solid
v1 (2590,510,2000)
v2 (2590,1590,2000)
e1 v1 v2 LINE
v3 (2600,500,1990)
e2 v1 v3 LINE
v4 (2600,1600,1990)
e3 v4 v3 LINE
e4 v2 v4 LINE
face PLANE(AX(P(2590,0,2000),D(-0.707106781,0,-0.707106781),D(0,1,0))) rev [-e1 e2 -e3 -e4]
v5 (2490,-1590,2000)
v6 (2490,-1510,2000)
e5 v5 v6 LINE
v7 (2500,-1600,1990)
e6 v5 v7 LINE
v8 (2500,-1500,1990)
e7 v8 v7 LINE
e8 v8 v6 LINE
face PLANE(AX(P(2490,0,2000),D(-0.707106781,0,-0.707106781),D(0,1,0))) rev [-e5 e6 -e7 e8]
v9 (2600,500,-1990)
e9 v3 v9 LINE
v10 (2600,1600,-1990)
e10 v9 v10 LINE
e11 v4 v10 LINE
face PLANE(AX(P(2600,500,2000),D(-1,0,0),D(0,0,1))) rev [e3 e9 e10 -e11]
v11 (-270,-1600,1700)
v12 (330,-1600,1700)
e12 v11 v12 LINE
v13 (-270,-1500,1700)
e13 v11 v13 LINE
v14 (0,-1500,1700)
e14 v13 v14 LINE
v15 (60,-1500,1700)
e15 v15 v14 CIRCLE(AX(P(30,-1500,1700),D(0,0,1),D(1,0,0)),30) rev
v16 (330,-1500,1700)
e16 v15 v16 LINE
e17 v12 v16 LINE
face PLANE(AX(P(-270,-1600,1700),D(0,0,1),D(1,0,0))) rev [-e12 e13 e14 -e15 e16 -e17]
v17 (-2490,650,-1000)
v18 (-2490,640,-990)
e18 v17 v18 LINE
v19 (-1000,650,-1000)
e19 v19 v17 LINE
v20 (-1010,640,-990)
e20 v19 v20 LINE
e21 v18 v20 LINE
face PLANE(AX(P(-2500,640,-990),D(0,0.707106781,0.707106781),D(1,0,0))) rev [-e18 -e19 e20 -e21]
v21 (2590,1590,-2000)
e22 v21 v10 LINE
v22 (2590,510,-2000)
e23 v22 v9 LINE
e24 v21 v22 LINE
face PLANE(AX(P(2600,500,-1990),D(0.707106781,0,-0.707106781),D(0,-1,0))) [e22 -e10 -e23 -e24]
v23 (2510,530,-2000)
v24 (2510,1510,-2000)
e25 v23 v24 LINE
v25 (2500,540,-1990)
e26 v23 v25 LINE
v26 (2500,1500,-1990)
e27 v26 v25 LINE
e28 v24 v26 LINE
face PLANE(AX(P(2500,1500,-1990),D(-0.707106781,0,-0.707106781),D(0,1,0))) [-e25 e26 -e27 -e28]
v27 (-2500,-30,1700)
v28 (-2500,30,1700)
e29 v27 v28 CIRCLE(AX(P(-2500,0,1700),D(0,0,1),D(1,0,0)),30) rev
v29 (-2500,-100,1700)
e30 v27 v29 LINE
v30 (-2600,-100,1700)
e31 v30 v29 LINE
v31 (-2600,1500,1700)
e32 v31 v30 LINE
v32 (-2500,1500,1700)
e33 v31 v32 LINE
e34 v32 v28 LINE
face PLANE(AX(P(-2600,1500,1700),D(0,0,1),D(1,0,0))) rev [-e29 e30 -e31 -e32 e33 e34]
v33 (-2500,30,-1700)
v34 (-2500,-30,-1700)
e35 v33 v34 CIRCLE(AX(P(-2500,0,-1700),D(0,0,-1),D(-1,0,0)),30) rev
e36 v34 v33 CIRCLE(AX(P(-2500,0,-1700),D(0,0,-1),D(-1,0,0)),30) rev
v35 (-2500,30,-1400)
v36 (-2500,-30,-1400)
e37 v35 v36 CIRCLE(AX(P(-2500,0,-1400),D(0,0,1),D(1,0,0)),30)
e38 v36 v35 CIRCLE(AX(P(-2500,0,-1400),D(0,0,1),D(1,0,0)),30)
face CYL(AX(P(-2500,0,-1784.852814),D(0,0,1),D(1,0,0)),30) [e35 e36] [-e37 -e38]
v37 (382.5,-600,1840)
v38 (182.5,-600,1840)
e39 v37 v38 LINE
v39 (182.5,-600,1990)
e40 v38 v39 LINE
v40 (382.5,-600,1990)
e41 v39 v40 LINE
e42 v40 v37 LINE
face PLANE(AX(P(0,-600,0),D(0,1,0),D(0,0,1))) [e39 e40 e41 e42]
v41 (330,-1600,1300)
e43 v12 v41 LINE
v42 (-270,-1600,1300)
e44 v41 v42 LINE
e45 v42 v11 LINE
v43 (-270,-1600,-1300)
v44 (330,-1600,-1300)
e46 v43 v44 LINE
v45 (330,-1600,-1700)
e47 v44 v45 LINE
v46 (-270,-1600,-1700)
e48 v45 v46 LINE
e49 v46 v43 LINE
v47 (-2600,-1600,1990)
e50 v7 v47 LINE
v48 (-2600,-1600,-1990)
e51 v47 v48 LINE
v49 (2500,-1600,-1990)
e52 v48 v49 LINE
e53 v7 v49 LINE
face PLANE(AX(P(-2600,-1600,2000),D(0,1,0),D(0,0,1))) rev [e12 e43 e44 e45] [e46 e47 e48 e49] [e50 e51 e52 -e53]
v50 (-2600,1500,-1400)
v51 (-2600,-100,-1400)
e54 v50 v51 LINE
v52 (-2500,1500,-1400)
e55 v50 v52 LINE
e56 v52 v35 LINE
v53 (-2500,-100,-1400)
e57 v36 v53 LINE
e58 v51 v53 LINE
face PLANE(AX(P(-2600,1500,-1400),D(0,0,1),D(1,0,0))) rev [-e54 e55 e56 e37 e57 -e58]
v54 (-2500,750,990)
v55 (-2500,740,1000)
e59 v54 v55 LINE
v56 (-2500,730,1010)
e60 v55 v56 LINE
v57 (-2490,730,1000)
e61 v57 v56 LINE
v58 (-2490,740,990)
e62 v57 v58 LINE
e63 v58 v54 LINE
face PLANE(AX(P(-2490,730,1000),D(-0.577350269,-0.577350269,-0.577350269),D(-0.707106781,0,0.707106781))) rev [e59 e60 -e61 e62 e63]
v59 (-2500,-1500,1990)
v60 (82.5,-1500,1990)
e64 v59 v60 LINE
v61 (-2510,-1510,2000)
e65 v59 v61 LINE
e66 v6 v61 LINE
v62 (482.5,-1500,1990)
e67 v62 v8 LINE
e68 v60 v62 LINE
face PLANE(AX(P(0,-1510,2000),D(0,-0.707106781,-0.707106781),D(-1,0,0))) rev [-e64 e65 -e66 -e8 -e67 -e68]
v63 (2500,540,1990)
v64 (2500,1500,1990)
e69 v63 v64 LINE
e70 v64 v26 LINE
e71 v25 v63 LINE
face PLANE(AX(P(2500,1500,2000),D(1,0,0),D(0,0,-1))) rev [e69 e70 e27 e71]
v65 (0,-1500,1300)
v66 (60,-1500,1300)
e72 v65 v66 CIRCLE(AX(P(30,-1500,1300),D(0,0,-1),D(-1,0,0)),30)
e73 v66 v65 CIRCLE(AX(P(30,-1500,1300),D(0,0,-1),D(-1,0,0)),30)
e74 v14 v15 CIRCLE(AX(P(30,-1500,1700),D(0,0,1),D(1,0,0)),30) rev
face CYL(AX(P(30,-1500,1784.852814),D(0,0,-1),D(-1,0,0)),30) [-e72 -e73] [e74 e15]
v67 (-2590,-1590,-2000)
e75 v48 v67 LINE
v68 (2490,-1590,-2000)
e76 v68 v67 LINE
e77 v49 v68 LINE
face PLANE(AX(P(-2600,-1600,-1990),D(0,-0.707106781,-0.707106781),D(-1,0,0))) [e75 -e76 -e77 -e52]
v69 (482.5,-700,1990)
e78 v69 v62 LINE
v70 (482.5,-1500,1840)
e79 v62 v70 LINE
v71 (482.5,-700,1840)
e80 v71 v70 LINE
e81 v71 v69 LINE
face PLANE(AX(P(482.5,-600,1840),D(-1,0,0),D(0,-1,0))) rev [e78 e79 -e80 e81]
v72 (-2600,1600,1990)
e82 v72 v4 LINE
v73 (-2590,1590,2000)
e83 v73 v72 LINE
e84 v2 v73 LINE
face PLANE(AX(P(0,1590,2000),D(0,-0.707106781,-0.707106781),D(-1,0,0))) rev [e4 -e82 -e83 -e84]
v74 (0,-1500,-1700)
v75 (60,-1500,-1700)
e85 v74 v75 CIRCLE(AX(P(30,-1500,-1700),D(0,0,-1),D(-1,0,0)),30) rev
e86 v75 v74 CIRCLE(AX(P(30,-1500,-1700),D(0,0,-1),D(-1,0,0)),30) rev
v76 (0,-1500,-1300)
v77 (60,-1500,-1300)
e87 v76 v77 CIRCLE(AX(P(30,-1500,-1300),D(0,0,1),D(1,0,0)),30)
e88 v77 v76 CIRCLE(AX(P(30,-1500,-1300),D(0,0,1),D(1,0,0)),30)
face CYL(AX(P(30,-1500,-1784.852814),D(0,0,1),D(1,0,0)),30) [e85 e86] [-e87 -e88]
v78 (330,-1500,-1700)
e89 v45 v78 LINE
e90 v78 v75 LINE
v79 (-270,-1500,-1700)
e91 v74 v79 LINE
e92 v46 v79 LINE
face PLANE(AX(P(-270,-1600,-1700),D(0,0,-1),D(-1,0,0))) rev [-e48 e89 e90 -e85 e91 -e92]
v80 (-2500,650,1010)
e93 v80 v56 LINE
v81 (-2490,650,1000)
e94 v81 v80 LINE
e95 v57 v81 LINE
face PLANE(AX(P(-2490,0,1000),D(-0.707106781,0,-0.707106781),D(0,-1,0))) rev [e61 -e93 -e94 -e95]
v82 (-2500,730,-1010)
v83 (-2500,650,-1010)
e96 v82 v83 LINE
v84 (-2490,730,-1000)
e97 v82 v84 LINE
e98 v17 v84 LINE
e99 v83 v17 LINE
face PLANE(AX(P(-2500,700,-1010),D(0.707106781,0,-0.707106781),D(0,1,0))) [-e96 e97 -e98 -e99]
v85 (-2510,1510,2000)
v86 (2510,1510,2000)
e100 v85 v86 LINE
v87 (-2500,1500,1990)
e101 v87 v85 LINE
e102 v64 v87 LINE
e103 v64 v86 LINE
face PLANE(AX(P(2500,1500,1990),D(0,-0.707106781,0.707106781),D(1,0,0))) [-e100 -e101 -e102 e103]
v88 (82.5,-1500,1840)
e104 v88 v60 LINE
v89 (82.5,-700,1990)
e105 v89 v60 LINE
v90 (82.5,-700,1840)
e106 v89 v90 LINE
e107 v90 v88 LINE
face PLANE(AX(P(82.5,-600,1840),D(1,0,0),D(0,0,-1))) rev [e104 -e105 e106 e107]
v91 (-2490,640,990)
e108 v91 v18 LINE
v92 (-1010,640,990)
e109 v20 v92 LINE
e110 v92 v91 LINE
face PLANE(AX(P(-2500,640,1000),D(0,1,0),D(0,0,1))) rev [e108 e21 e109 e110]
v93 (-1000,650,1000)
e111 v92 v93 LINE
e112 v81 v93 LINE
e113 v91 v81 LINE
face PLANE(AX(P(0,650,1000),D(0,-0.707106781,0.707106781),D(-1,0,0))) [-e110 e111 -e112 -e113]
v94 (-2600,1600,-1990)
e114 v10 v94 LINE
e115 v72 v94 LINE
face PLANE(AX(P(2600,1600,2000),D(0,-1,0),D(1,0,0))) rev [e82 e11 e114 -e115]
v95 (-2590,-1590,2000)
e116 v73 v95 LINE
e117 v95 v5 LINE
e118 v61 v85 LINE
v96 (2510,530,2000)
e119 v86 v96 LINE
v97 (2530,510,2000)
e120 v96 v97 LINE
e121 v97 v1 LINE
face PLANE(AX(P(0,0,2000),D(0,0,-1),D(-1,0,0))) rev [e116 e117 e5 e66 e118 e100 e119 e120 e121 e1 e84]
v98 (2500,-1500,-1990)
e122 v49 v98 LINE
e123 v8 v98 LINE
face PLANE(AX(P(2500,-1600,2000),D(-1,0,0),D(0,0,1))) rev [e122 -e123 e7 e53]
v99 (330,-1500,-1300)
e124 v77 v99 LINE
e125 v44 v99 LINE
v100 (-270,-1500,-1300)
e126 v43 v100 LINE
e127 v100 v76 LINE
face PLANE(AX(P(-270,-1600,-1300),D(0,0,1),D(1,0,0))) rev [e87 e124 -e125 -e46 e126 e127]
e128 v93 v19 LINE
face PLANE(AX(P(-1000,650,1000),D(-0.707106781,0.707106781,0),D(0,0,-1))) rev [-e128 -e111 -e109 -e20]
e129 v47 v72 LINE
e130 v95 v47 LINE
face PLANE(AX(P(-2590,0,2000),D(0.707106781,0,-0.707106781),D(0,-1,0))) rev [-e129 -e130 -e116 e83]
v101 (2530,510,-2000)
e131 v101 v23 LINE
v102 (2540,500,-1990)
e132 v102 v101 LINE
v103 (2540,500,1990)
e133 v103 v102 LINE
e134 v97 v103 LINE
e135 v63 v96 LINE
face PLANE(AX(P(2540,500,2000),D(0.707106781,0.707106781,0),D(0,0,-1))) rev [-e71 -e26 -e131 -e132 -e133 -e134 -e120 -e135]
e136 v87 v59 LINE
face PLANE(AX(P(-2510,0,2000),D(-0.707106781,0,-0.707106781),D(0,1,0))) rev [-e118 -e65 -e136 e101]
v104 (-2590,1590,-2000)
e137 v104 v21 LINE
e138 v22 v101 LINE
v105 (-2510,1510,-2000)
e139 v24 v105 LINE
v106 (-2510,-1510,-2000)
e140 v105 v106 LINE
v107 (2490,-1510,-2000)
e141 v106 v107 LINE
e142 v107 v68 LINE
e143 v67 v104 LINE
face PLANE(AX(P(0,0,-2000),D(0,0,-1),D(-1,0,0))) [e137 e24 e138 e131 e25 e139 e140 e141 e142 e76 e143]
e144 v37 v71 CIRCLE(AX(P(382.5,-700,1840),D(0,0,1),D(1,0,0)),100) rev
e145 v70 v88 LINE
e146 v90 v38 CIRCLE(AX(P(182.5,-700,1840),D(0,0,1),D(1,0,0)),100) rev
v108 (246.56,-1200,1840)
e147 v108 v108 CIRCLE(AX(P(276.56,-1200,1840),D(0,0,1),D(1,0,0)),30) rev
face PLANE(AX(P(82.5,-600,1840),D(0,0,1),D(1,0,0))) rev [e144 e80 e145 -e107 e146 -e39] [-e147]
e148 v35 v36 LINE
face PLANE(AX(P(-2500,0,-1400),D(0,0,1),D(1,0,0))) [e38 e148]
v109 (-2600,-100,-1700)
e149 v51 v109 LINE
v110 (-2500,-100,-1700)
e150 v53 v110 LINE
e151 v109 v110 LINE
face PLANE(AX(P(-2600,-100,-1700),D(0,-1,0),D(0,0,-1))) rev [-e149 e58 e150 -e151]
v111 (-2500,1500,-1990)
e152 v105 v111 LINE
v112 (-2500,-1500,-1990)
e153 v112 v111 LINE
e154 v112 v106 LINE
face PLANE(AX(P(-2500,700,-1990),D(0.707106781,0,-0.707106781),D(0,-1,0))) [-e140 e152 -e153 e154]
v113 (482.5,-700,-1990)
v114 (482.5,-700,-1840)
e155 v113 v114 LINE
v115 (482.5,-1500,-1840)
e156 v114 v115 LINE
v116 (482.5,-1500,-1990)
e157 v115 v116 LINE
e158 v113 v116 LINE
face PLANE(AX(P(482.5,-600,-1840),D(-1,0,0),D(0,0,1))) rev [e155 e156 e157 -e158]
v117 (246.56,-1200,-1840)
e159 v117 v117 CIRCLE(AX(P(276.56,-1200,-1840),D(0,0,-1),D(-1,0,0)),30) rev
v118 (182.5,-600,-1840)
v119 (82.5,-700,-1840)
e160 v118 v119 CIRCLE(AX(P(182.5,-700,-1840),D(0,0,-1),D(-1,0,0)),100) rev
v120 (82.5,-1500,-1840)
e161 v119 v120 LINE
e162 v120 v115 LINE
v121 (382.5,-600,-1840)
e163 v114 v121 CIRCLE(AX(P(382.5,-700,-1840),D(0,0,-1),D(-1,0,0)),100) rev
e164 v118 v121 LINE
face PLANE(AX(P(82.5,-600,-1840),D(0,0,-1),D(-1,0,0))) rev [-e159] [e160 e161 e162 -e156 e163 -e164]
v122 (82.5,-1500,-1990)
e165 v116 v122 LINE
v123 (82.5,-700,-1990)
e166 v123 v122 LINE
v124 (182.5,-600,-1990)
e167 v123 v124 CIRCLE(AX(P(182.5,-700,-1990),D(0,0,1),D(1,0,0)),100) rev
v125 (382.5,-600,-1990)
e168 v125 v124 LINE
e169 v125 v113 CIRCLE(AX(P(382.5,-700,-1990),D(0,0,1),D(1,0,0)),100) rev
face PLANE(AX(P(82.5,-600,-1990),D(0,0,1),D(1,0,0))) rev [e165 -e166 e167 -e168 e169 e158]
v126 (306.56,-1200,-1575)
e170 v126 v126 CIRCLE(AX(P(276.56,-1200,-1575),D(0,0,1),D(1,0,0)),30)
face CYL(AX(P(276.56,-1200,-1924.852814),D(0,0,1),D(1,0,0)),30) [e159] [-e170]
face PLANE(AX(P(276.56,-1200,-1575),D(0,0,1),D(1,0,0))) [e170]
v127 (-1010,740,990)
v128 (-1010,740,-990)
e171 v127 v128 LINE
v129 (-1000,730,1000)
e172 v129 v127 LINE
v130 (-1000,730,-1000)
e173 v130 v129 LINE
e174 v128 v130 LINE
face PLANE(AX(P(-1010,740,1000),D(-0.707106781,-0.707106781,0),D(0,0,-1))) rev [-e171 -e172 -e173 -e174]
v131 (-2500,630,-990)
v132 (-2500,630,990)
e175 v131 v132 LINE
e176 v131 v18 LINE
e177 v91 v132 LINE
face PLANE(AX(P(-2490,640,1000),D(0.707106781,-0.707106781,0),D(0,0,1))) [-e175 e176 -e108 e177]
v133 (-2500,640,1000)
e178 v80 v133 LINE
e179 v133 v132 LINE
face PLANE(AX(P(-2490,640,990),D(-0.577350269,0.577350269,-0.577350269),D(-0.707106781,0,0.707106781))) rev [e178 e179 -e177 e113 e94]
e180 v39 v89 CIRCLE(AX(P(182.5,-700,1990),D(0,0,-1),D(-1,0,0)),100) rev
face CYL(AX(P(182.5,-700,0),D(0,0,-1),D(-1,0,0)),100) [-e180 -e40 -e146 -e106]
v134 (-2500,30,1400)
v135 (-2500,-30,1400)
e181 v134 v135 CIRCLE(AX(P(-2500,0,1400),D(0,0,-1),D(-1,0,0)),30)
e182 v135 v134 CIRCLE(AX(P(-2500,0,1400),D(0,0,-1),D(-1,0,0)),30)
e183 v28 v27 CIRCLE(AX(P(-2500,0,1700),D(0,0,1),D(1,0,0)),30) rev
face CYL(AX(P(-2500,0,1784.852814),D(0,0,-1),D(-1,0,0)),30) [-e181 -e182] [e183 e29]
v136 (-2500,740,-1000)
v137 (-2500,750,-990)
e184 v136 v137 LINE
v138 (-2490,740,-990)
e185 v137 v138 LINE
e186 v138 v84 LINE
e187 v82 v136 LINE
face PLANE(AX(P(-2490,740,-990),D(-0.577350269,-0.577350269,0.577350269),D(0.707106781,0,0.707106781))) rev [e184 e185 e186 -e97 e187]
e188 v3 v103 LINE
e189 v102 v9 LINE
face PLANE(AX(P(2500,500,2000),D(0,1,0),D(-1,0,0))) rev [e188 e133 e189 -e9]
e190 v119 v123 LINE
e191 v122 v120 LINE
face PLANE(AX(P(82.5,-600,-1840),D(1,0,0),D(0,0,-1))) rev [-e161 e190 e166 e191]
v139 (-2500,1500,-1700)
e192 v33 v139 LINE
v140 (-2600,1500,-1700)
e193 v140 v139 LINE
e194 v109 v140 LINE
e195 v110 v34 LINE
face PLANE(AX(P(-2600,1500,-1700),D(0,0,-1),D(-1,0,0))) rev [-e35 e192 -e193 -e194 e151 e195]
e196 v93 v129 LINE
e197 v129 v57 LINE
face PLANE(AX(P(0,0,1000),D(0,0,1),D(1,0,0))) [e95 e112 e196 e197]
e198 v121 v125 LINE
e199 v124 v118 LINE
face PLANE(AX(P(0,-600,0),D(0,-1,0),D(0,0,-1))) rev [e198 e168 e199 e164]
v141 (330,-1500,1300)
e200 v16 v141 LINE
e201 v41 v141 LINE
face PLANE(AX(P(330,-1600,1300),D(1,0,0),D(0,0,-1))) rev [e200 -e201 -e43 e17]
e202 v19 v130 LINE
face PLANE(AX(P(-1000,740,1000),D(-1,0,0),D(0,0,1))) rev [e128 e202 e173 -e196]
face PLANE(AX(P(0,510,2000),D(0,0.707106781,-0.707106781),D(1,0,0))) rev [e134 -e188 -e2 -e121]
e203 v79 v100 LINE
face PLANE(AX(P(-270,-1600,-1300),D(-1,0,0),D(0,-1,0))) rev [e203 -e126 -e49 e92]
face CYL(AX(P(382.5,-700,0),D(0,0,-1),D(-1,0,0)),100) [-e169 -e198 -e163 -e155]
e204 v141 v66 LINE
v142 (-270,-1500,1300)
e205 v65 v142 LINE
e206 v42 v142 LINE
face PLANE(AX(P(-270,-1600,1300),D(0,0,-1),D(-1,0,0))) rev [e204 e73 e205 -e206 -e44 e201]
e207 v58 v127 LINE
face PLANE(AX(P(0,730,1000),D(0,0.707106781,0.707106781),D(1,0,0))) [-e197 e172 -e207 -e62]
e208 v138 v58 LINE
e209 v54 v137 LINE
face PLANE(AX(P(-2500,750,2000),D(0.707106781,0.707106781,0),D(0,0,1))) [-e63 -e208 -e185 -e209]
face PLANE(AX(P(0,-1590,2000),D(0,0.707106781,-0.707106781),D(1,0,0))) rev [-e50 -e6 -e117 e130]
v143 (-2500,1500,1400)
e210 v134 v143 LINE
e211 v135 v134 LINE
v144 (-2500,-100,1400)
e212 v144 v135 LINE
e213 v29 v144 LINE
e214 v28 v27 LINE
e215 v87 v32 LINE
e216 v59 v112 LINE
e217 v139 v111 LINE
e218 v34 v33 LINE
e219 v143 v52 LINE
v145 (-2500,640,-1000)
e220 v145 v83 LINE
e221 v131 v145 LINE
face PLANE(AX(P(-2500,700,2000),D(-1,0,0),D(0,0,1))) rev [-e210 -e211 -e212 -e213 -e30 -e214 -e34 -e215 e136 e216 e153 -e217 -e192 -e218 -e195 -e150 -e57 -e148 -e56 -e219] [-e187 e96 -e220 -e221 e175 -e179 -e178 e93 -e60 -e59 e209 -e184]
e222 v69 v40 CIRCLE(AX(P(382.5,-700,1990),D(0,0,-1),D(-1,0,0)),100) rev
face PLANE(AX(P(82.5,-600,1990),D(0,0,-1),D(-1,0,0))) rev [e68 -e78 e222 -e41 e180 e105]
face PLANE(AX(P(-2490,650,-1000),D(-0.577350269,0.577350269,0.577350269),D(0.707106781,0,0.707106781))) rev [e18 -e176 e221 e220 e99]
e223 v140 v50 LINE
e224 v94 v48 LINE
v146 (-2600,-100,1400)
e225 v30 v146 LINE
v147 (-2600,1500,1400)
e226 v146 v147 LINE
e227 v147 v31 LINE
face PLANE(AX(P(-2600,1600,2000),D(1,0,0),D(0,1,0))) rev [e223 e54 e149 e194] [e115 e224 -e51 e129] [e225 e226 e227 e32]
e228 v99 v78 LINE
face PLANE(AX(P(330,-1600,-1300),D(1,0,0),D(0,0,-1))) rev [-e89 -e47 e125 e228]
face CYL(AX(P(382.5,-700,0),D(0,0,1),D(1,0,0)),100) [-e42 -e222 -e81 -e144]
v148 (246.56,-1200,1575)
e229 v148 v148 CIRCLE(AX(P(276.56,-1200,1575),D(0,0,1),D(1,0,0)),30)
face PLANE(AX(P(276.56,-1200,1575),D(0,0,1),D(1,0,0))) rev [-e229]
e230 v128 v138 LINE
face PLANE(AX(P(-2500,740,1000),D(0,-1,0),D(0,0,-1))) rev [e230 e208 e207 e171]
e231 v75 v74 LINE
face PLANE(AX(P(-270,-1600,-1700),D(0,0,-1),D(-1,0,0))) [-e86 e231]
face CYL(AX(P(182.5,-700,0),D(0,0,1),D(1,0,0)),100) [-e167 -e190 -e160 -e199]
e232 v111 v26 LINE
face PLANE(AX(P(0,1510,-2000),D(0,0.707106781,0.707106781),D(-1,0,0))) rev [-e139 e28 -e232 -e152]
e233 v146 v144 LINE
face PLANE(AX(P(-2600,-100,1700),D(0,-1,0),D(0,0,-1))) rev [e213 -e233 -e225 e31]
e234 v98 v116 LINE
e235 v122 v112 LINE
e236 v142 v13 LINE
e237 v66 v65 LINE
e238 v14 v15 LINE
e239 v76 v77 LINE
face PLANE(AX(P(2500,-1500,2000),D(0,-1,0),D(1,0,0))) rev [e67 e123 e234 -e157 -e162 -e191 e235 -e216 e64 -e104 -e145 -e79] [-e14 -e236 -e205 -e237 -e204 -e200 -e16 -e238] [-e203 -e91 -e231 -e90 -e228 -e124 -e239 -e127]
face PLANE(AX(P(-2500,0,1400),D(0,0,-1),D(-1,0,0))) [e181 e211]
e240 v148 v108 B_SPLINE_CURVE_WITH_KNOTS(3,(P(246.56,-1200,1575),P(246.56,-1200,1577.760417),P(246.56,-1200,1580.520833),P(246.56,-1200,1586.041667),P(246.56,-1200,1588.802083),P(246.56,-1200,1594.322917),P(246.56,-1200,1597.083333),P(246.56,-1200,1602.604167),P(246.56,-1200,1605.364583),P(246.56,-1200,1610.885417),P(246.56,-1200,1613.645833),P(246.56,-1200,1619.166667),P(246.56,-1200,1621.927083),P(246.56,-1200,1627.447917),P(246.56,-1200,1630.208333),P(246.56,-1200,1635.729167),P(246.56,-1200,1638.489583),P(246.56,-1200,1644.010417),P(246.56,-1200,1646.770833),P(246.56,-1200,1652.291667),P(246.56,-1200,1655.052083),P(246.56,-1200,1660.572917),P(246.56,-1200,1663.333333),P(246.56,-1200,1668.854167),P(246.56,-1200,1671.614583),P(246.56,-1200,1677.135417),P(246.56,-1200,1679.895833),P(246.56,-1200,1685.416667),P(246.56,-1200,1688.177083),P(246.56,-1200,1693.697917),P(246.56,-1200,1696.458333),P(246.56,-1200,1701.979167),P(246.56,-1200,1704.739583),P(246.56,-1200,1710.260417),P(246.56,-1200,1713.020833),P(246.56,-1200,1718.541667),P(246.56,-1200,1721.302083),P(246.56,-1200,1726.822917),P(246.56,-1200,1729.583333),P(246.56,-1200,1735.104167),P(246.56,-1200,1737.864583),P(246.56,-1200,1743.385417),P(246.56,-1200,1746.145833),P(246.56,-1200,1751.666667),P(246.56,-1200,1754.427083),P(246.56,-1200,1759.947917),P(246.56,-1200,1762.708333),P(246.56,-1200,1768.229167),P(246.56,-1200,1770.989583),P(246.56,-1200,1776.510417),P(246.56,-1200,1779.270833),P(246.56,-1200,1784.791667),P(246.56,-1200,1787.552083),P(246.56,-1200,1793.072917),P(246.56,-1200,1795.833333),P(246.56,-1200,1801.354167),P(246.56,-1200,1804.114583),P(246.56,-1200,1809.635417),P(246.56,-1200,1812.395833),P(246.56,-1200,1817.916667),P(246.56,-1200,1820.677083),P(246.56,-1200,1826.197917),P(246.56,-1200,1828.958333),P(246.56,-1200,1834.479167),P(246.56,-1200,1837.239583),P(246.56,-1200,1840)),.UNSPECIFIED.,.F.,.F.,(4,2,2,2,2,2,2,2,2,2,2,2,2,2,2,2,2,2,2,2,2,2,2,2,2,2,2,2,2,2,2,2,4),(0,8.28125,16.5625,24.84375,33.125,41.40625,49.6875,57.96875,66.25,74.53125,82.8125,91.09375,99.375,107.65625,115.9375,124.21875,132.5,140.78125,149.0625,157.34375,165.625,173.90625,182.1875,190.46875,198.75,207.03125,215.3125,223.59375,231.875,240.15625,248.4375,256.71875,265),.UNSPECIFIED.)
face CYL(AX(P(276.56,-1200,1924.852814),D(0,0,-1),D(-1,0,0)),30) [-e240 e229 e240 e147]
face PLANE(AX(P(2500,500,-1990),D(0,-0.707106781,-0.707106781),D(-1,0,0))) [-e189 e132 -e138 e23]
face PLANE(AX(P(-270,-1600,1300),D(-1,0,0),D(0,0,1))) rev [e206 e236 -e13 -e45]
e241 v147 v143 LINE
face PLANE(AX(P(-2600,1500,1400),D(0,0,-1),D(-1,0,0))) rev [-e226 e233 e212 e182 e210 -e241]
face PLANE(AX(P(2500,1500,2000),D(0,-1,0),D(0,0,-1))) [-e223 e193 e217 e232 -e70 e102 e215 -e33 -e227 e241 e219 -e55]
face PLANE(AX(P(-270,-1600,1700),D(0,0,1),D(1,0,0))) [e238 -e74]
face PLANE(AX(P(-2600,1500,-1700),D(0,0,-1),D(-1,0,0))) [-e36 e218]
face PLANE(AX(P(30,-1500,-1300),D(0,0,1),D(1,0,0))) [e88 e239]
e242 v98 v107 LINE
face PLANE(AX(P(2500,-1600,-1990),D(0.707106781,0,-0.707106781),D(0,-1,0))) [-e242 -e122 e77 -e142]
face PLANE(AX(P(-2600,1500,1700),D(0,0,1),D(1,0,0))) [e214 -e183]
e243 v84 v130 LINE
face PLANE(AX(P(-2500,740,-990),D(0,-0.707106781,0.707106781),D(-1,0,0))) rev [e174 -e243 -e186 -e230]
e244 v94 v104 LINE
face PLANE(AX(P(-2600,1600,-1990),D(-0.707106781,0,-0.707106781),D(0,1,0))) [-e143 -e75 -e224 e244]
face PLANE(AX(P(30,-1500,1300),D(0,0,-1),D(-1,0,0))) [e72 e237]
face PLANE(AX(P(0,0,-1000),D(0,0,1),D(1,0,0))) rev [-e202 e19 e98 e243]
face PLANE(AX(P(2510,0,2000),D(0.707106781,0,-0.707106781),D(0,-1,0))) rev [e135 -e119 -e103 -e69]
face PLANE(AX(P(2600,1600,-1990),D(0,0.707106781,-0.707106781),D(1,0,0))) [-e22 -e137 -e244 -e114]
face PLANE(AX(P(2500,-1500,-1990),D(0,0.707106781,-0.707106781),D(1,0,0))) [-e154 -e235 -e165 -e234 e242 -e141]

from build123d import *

# Parameters (mm, degrees)
BOSS_EXTRUDE1_DEPTH  = 2000
SKETCH4_W            = 600
SKETCH4_H            = 400
CUT_EXTRUDE1_DEPTH   = 4514.313638559
BOSS_EXTRUDE5_START  = 1300
SKETCH5_R            = 30
BOSS_EXTRUDE5_DEPTH  = 400
BOSS_EXTRUDE6_START  = -1700
SKETCH5_2_R          = 30
BOSS_EXTRUDE6_DEPTH  = 400
SKETCH6_W            = 300
SKETCH6_H            = 1600
CUT_EXTRUDE2_DEPTH   = 5708.013229352
BOSS_EXTRUDE7_START  = -1400
SKETCH7_R            = 30
BOSS_EXTRUDE7_DEPTH  = 300
BOSS_EXTRUDE8_START  = 1700
SKETCH7_2_R          = 30
BOSS_EXTRUDE8_DEPTH  = 300
SKETCH10_W           = 1500
SKETCH10_H           = 100
BOSS_EXTRUDE9_DEPTH  = 1000
CHAMFER1_SIZE        = 10
SKETCH12_W           = 400
SKETCH12_H           = 150
BOSS_EXTRUDE10_DEPTH = 900
FILLET4_R            = 100
BOSS_EXTRUDE11_START = 1575
SKETCH13_R           = 30
BOSS_EXTRUDE11_DEPTH = 265
BOSS_EXTRUDE12_START = -1840
SKETCH13_2_R         = 30
BOSS_EXTRUDE12_DEPTH = 265
CHAMFER4_SIZE        = 40


with BuildPart() as part:
    # Sketch1 → Boss-Extrude1 (new, symmetric)
    with BuildSketch(Plane.XY):
        Polygon((2500, -1500), (-2500, -1500), (-2500, 700), (-2500, 1500), (2500, 1500), (2500, 500), (2600, 500), (2600, 1600), (-2600, 1600), (-2600, -1600), (2500, -1600), align=None)
    extrude(amount=BOSS_EXTRUDE1_DEPTH, both=True)

    # Sketch4 → Cut-Extrude1 (cut, through all)
    with BuildSketch(Plane(origin=(0, -1500, 0), x_dir=(1, 0, 0), z_dir=(0, 1, 0))):
        with Locations((30, -1500)):
            Rectangle(SKETCH4_W, SKETCH4_H)
        with Locations((30, 1500)):
            Rectangle(SKETCH4_W, SKETCH4_H)
    extrude(amount=-CUT_EXTRUDE1_DEPTH, mode=Mode.SUBTRACT)

    # Sketch5 → Boss-Extrude5 (add)
    with BuildSketch(Plane.XY.offset(BOSS_EXTRUDE5_START)):
        with Locations(Location((30, -1500, 0), (0, 0, 180))):
            Circle(SKETCH5_R)
    extrude(amount=BOSS_EXTRUDE5_DEPTH)

    # Sketch5<2> → Boss-Extrude6 (add)
    with BuildSketch(Plane.XY.offset(BOSS_EXTRUDE6_START)):
        with Locations(Location((30, -1500, 0), (0, 0, 180))):
            Circle(SKETCH5_2_R)
    extrude(amount=BOSS_EXTRUDE6_DEPTH)

    # Sketch6 → Cut-Extrude2 (cut, through all)
    with BuildSketch(Plane(origin=(-2500, 0, 0), x_dir=(0, 0, -1), z_dir=(1, 0, 0))):
        with Locations((-1550, 700)):
            Rectangle(SKETCH6_W, SKETCH6_H)
        with Locations((1550, 700)):
            Rectangle(SKETCH6_W, SKETCH6_H)
    extrude(amount=-CUT_EXTRUDE2_DEPTH, mode=Mode.SUBTRACT)

    # Sketch7 → Boss-Extrude7 (add)
    with BuildSketch(Plane.XY.offset(BOSS_EXTRUDE7_START)):
        with Locations(Location((-2500, 0, 0), (0, 0, 90))):
            Circle(SKETCH7_R)
    extrude(amount=-BOSS_EXTRUDE7_DEPTH)

    # Sketch7<2> → Boss-Extrude8 (add)
    with BuildSketch(Plane.XY.offset(BOSS_EXTRUDE8_START)):
        with Locations(Location((-2500, 0, 0), (0, 0, 90))):
            Circle(SKETCH7_2_R)
    extrude(amount=-BOSS_EXTRUDE8_DEPTH)

    # Sketch10 → Boss-Extrude9 (add, symmetric)
    with BuildSketch(Plane.XY):
        with Locations((-1750, 690)):
            Rectangle(SKETCH10_W, SKETCH10_H)
    extrude(amount=BOSS_EXTRUDE9_DEPTH, both=True)

    # Chamfer1
    chamfer1_edges = [part.edges().sort_by_distance(p)[0] for p in [
        (2500, -1550, -2000),
        (-50, -1600, -2000),
        (-2600, 0, -2000),
        (0, 1600, -2000),
        (2600, 1050, -2000),
        (2550, 500, -2000),
        (2500, 1000, -2000),
        (-1000, 640, 0),
        (-1750, 740, -1000),
        (-1000, 740, 0),
        (-2500, 690, -1000),
        (-2500, 740, 0),
        (0, 1500, -2000),
        (-1750, 640, -1000),
        (-2500, 640, 0),
        (-1750, 740, 1000),
        (0, 1500, 2000),
        (-2500, 690, 1000),
        (-1750, 640, 1000),
        (-2500, 0, -2000),
        (0, -1500, -2000),
        (2500, 1000, 2000),
        (2550, 500, 2000),
        (2600, 1050, 2000),
        (0, 1600, 2000),
        (-2600, 0, 2000),
        (-50, -1600, 2000),
        (2500, -1550, 2000),
        (0, -1500, 2000),
        (-2500, 0, 2000),
    ]]
    chamfer(chamfer1_edges, length=CHAMFER1_SIZE)

    # Sketch12 → Boss-Extrude10 (add)
    with BuildSketch(Plane(origin=(0, -1500, 0), x_dir=(1, 0, 0), z_dir=(0, 1, 0))):
        with Locations((282.5, -1915)):
            Rectangle(SKETCH12_W, SKETCH12_H)
        with Locations((282.5, 1915)):
            Rectangle(SKETCH12_W, SKETCH12_H)
    extrude(amount=BOSS_EXTRUDE10_DEPTH)

    # Fillet4
    fillet4_edges = [part.edges().sort_by_distance(p)[0] for p in [
        (482.5, -600, 1915),
        (82.5, -600, 1915),
        (82.5, -600, -1915),
        (482.5, -600, -1915),
    ]]
    fillet(fillet4_edges, radius=FILLET4_R)

    # Sketch13 → Boss-Extrude11 (add)
    with BuildSketch(Plane.XY.offset(BOSS_EXTRUDE11_START)):
        with Locations(Location((276.56, -1200, 0), (0, 0, 180))):
            Circle(SKETCH13_R)
    extrude(amount=BOSS_EXTRUDE11_DEPTH)

    # Sketch13<2> → Boss-Extrude12 (add)
    with BuildSketch(Plane.XY.offset(BOSS_EXTRUDE12_START)):
        with Locations(Location((276.56, -1200, 0), (0, 0, 180))):
            Circle(SKETCH13_2_R)
    extrude(amount=BOSS_EXTRUDE12_DEPTH)

    # Chamfer4
    # the kernel refuses this chamfer: 40 mm, written as the material it takes off along each edge
    with BuildSketch(Plane(origin=(2500, 500, -2092.867319519), x_dir=(-0.02749587661058214, 0.9996219169112969, 0), z_dir=(0, 0, 1))) as chamfer4_piece_1:
        Polygon((CHAMFER4_SIZE * 0.999621916911, -CHAMFER4_SIZE * 0.0274958766106), (-CHAMFER4_SIZE * 0.0274958766106, -CHAMFER4_SIZE * 0.999621916911), (0, 0), align=None)
    extrude(amount=4185.734639037, mode=Mode.SUBTRACT)


solid = part.part
